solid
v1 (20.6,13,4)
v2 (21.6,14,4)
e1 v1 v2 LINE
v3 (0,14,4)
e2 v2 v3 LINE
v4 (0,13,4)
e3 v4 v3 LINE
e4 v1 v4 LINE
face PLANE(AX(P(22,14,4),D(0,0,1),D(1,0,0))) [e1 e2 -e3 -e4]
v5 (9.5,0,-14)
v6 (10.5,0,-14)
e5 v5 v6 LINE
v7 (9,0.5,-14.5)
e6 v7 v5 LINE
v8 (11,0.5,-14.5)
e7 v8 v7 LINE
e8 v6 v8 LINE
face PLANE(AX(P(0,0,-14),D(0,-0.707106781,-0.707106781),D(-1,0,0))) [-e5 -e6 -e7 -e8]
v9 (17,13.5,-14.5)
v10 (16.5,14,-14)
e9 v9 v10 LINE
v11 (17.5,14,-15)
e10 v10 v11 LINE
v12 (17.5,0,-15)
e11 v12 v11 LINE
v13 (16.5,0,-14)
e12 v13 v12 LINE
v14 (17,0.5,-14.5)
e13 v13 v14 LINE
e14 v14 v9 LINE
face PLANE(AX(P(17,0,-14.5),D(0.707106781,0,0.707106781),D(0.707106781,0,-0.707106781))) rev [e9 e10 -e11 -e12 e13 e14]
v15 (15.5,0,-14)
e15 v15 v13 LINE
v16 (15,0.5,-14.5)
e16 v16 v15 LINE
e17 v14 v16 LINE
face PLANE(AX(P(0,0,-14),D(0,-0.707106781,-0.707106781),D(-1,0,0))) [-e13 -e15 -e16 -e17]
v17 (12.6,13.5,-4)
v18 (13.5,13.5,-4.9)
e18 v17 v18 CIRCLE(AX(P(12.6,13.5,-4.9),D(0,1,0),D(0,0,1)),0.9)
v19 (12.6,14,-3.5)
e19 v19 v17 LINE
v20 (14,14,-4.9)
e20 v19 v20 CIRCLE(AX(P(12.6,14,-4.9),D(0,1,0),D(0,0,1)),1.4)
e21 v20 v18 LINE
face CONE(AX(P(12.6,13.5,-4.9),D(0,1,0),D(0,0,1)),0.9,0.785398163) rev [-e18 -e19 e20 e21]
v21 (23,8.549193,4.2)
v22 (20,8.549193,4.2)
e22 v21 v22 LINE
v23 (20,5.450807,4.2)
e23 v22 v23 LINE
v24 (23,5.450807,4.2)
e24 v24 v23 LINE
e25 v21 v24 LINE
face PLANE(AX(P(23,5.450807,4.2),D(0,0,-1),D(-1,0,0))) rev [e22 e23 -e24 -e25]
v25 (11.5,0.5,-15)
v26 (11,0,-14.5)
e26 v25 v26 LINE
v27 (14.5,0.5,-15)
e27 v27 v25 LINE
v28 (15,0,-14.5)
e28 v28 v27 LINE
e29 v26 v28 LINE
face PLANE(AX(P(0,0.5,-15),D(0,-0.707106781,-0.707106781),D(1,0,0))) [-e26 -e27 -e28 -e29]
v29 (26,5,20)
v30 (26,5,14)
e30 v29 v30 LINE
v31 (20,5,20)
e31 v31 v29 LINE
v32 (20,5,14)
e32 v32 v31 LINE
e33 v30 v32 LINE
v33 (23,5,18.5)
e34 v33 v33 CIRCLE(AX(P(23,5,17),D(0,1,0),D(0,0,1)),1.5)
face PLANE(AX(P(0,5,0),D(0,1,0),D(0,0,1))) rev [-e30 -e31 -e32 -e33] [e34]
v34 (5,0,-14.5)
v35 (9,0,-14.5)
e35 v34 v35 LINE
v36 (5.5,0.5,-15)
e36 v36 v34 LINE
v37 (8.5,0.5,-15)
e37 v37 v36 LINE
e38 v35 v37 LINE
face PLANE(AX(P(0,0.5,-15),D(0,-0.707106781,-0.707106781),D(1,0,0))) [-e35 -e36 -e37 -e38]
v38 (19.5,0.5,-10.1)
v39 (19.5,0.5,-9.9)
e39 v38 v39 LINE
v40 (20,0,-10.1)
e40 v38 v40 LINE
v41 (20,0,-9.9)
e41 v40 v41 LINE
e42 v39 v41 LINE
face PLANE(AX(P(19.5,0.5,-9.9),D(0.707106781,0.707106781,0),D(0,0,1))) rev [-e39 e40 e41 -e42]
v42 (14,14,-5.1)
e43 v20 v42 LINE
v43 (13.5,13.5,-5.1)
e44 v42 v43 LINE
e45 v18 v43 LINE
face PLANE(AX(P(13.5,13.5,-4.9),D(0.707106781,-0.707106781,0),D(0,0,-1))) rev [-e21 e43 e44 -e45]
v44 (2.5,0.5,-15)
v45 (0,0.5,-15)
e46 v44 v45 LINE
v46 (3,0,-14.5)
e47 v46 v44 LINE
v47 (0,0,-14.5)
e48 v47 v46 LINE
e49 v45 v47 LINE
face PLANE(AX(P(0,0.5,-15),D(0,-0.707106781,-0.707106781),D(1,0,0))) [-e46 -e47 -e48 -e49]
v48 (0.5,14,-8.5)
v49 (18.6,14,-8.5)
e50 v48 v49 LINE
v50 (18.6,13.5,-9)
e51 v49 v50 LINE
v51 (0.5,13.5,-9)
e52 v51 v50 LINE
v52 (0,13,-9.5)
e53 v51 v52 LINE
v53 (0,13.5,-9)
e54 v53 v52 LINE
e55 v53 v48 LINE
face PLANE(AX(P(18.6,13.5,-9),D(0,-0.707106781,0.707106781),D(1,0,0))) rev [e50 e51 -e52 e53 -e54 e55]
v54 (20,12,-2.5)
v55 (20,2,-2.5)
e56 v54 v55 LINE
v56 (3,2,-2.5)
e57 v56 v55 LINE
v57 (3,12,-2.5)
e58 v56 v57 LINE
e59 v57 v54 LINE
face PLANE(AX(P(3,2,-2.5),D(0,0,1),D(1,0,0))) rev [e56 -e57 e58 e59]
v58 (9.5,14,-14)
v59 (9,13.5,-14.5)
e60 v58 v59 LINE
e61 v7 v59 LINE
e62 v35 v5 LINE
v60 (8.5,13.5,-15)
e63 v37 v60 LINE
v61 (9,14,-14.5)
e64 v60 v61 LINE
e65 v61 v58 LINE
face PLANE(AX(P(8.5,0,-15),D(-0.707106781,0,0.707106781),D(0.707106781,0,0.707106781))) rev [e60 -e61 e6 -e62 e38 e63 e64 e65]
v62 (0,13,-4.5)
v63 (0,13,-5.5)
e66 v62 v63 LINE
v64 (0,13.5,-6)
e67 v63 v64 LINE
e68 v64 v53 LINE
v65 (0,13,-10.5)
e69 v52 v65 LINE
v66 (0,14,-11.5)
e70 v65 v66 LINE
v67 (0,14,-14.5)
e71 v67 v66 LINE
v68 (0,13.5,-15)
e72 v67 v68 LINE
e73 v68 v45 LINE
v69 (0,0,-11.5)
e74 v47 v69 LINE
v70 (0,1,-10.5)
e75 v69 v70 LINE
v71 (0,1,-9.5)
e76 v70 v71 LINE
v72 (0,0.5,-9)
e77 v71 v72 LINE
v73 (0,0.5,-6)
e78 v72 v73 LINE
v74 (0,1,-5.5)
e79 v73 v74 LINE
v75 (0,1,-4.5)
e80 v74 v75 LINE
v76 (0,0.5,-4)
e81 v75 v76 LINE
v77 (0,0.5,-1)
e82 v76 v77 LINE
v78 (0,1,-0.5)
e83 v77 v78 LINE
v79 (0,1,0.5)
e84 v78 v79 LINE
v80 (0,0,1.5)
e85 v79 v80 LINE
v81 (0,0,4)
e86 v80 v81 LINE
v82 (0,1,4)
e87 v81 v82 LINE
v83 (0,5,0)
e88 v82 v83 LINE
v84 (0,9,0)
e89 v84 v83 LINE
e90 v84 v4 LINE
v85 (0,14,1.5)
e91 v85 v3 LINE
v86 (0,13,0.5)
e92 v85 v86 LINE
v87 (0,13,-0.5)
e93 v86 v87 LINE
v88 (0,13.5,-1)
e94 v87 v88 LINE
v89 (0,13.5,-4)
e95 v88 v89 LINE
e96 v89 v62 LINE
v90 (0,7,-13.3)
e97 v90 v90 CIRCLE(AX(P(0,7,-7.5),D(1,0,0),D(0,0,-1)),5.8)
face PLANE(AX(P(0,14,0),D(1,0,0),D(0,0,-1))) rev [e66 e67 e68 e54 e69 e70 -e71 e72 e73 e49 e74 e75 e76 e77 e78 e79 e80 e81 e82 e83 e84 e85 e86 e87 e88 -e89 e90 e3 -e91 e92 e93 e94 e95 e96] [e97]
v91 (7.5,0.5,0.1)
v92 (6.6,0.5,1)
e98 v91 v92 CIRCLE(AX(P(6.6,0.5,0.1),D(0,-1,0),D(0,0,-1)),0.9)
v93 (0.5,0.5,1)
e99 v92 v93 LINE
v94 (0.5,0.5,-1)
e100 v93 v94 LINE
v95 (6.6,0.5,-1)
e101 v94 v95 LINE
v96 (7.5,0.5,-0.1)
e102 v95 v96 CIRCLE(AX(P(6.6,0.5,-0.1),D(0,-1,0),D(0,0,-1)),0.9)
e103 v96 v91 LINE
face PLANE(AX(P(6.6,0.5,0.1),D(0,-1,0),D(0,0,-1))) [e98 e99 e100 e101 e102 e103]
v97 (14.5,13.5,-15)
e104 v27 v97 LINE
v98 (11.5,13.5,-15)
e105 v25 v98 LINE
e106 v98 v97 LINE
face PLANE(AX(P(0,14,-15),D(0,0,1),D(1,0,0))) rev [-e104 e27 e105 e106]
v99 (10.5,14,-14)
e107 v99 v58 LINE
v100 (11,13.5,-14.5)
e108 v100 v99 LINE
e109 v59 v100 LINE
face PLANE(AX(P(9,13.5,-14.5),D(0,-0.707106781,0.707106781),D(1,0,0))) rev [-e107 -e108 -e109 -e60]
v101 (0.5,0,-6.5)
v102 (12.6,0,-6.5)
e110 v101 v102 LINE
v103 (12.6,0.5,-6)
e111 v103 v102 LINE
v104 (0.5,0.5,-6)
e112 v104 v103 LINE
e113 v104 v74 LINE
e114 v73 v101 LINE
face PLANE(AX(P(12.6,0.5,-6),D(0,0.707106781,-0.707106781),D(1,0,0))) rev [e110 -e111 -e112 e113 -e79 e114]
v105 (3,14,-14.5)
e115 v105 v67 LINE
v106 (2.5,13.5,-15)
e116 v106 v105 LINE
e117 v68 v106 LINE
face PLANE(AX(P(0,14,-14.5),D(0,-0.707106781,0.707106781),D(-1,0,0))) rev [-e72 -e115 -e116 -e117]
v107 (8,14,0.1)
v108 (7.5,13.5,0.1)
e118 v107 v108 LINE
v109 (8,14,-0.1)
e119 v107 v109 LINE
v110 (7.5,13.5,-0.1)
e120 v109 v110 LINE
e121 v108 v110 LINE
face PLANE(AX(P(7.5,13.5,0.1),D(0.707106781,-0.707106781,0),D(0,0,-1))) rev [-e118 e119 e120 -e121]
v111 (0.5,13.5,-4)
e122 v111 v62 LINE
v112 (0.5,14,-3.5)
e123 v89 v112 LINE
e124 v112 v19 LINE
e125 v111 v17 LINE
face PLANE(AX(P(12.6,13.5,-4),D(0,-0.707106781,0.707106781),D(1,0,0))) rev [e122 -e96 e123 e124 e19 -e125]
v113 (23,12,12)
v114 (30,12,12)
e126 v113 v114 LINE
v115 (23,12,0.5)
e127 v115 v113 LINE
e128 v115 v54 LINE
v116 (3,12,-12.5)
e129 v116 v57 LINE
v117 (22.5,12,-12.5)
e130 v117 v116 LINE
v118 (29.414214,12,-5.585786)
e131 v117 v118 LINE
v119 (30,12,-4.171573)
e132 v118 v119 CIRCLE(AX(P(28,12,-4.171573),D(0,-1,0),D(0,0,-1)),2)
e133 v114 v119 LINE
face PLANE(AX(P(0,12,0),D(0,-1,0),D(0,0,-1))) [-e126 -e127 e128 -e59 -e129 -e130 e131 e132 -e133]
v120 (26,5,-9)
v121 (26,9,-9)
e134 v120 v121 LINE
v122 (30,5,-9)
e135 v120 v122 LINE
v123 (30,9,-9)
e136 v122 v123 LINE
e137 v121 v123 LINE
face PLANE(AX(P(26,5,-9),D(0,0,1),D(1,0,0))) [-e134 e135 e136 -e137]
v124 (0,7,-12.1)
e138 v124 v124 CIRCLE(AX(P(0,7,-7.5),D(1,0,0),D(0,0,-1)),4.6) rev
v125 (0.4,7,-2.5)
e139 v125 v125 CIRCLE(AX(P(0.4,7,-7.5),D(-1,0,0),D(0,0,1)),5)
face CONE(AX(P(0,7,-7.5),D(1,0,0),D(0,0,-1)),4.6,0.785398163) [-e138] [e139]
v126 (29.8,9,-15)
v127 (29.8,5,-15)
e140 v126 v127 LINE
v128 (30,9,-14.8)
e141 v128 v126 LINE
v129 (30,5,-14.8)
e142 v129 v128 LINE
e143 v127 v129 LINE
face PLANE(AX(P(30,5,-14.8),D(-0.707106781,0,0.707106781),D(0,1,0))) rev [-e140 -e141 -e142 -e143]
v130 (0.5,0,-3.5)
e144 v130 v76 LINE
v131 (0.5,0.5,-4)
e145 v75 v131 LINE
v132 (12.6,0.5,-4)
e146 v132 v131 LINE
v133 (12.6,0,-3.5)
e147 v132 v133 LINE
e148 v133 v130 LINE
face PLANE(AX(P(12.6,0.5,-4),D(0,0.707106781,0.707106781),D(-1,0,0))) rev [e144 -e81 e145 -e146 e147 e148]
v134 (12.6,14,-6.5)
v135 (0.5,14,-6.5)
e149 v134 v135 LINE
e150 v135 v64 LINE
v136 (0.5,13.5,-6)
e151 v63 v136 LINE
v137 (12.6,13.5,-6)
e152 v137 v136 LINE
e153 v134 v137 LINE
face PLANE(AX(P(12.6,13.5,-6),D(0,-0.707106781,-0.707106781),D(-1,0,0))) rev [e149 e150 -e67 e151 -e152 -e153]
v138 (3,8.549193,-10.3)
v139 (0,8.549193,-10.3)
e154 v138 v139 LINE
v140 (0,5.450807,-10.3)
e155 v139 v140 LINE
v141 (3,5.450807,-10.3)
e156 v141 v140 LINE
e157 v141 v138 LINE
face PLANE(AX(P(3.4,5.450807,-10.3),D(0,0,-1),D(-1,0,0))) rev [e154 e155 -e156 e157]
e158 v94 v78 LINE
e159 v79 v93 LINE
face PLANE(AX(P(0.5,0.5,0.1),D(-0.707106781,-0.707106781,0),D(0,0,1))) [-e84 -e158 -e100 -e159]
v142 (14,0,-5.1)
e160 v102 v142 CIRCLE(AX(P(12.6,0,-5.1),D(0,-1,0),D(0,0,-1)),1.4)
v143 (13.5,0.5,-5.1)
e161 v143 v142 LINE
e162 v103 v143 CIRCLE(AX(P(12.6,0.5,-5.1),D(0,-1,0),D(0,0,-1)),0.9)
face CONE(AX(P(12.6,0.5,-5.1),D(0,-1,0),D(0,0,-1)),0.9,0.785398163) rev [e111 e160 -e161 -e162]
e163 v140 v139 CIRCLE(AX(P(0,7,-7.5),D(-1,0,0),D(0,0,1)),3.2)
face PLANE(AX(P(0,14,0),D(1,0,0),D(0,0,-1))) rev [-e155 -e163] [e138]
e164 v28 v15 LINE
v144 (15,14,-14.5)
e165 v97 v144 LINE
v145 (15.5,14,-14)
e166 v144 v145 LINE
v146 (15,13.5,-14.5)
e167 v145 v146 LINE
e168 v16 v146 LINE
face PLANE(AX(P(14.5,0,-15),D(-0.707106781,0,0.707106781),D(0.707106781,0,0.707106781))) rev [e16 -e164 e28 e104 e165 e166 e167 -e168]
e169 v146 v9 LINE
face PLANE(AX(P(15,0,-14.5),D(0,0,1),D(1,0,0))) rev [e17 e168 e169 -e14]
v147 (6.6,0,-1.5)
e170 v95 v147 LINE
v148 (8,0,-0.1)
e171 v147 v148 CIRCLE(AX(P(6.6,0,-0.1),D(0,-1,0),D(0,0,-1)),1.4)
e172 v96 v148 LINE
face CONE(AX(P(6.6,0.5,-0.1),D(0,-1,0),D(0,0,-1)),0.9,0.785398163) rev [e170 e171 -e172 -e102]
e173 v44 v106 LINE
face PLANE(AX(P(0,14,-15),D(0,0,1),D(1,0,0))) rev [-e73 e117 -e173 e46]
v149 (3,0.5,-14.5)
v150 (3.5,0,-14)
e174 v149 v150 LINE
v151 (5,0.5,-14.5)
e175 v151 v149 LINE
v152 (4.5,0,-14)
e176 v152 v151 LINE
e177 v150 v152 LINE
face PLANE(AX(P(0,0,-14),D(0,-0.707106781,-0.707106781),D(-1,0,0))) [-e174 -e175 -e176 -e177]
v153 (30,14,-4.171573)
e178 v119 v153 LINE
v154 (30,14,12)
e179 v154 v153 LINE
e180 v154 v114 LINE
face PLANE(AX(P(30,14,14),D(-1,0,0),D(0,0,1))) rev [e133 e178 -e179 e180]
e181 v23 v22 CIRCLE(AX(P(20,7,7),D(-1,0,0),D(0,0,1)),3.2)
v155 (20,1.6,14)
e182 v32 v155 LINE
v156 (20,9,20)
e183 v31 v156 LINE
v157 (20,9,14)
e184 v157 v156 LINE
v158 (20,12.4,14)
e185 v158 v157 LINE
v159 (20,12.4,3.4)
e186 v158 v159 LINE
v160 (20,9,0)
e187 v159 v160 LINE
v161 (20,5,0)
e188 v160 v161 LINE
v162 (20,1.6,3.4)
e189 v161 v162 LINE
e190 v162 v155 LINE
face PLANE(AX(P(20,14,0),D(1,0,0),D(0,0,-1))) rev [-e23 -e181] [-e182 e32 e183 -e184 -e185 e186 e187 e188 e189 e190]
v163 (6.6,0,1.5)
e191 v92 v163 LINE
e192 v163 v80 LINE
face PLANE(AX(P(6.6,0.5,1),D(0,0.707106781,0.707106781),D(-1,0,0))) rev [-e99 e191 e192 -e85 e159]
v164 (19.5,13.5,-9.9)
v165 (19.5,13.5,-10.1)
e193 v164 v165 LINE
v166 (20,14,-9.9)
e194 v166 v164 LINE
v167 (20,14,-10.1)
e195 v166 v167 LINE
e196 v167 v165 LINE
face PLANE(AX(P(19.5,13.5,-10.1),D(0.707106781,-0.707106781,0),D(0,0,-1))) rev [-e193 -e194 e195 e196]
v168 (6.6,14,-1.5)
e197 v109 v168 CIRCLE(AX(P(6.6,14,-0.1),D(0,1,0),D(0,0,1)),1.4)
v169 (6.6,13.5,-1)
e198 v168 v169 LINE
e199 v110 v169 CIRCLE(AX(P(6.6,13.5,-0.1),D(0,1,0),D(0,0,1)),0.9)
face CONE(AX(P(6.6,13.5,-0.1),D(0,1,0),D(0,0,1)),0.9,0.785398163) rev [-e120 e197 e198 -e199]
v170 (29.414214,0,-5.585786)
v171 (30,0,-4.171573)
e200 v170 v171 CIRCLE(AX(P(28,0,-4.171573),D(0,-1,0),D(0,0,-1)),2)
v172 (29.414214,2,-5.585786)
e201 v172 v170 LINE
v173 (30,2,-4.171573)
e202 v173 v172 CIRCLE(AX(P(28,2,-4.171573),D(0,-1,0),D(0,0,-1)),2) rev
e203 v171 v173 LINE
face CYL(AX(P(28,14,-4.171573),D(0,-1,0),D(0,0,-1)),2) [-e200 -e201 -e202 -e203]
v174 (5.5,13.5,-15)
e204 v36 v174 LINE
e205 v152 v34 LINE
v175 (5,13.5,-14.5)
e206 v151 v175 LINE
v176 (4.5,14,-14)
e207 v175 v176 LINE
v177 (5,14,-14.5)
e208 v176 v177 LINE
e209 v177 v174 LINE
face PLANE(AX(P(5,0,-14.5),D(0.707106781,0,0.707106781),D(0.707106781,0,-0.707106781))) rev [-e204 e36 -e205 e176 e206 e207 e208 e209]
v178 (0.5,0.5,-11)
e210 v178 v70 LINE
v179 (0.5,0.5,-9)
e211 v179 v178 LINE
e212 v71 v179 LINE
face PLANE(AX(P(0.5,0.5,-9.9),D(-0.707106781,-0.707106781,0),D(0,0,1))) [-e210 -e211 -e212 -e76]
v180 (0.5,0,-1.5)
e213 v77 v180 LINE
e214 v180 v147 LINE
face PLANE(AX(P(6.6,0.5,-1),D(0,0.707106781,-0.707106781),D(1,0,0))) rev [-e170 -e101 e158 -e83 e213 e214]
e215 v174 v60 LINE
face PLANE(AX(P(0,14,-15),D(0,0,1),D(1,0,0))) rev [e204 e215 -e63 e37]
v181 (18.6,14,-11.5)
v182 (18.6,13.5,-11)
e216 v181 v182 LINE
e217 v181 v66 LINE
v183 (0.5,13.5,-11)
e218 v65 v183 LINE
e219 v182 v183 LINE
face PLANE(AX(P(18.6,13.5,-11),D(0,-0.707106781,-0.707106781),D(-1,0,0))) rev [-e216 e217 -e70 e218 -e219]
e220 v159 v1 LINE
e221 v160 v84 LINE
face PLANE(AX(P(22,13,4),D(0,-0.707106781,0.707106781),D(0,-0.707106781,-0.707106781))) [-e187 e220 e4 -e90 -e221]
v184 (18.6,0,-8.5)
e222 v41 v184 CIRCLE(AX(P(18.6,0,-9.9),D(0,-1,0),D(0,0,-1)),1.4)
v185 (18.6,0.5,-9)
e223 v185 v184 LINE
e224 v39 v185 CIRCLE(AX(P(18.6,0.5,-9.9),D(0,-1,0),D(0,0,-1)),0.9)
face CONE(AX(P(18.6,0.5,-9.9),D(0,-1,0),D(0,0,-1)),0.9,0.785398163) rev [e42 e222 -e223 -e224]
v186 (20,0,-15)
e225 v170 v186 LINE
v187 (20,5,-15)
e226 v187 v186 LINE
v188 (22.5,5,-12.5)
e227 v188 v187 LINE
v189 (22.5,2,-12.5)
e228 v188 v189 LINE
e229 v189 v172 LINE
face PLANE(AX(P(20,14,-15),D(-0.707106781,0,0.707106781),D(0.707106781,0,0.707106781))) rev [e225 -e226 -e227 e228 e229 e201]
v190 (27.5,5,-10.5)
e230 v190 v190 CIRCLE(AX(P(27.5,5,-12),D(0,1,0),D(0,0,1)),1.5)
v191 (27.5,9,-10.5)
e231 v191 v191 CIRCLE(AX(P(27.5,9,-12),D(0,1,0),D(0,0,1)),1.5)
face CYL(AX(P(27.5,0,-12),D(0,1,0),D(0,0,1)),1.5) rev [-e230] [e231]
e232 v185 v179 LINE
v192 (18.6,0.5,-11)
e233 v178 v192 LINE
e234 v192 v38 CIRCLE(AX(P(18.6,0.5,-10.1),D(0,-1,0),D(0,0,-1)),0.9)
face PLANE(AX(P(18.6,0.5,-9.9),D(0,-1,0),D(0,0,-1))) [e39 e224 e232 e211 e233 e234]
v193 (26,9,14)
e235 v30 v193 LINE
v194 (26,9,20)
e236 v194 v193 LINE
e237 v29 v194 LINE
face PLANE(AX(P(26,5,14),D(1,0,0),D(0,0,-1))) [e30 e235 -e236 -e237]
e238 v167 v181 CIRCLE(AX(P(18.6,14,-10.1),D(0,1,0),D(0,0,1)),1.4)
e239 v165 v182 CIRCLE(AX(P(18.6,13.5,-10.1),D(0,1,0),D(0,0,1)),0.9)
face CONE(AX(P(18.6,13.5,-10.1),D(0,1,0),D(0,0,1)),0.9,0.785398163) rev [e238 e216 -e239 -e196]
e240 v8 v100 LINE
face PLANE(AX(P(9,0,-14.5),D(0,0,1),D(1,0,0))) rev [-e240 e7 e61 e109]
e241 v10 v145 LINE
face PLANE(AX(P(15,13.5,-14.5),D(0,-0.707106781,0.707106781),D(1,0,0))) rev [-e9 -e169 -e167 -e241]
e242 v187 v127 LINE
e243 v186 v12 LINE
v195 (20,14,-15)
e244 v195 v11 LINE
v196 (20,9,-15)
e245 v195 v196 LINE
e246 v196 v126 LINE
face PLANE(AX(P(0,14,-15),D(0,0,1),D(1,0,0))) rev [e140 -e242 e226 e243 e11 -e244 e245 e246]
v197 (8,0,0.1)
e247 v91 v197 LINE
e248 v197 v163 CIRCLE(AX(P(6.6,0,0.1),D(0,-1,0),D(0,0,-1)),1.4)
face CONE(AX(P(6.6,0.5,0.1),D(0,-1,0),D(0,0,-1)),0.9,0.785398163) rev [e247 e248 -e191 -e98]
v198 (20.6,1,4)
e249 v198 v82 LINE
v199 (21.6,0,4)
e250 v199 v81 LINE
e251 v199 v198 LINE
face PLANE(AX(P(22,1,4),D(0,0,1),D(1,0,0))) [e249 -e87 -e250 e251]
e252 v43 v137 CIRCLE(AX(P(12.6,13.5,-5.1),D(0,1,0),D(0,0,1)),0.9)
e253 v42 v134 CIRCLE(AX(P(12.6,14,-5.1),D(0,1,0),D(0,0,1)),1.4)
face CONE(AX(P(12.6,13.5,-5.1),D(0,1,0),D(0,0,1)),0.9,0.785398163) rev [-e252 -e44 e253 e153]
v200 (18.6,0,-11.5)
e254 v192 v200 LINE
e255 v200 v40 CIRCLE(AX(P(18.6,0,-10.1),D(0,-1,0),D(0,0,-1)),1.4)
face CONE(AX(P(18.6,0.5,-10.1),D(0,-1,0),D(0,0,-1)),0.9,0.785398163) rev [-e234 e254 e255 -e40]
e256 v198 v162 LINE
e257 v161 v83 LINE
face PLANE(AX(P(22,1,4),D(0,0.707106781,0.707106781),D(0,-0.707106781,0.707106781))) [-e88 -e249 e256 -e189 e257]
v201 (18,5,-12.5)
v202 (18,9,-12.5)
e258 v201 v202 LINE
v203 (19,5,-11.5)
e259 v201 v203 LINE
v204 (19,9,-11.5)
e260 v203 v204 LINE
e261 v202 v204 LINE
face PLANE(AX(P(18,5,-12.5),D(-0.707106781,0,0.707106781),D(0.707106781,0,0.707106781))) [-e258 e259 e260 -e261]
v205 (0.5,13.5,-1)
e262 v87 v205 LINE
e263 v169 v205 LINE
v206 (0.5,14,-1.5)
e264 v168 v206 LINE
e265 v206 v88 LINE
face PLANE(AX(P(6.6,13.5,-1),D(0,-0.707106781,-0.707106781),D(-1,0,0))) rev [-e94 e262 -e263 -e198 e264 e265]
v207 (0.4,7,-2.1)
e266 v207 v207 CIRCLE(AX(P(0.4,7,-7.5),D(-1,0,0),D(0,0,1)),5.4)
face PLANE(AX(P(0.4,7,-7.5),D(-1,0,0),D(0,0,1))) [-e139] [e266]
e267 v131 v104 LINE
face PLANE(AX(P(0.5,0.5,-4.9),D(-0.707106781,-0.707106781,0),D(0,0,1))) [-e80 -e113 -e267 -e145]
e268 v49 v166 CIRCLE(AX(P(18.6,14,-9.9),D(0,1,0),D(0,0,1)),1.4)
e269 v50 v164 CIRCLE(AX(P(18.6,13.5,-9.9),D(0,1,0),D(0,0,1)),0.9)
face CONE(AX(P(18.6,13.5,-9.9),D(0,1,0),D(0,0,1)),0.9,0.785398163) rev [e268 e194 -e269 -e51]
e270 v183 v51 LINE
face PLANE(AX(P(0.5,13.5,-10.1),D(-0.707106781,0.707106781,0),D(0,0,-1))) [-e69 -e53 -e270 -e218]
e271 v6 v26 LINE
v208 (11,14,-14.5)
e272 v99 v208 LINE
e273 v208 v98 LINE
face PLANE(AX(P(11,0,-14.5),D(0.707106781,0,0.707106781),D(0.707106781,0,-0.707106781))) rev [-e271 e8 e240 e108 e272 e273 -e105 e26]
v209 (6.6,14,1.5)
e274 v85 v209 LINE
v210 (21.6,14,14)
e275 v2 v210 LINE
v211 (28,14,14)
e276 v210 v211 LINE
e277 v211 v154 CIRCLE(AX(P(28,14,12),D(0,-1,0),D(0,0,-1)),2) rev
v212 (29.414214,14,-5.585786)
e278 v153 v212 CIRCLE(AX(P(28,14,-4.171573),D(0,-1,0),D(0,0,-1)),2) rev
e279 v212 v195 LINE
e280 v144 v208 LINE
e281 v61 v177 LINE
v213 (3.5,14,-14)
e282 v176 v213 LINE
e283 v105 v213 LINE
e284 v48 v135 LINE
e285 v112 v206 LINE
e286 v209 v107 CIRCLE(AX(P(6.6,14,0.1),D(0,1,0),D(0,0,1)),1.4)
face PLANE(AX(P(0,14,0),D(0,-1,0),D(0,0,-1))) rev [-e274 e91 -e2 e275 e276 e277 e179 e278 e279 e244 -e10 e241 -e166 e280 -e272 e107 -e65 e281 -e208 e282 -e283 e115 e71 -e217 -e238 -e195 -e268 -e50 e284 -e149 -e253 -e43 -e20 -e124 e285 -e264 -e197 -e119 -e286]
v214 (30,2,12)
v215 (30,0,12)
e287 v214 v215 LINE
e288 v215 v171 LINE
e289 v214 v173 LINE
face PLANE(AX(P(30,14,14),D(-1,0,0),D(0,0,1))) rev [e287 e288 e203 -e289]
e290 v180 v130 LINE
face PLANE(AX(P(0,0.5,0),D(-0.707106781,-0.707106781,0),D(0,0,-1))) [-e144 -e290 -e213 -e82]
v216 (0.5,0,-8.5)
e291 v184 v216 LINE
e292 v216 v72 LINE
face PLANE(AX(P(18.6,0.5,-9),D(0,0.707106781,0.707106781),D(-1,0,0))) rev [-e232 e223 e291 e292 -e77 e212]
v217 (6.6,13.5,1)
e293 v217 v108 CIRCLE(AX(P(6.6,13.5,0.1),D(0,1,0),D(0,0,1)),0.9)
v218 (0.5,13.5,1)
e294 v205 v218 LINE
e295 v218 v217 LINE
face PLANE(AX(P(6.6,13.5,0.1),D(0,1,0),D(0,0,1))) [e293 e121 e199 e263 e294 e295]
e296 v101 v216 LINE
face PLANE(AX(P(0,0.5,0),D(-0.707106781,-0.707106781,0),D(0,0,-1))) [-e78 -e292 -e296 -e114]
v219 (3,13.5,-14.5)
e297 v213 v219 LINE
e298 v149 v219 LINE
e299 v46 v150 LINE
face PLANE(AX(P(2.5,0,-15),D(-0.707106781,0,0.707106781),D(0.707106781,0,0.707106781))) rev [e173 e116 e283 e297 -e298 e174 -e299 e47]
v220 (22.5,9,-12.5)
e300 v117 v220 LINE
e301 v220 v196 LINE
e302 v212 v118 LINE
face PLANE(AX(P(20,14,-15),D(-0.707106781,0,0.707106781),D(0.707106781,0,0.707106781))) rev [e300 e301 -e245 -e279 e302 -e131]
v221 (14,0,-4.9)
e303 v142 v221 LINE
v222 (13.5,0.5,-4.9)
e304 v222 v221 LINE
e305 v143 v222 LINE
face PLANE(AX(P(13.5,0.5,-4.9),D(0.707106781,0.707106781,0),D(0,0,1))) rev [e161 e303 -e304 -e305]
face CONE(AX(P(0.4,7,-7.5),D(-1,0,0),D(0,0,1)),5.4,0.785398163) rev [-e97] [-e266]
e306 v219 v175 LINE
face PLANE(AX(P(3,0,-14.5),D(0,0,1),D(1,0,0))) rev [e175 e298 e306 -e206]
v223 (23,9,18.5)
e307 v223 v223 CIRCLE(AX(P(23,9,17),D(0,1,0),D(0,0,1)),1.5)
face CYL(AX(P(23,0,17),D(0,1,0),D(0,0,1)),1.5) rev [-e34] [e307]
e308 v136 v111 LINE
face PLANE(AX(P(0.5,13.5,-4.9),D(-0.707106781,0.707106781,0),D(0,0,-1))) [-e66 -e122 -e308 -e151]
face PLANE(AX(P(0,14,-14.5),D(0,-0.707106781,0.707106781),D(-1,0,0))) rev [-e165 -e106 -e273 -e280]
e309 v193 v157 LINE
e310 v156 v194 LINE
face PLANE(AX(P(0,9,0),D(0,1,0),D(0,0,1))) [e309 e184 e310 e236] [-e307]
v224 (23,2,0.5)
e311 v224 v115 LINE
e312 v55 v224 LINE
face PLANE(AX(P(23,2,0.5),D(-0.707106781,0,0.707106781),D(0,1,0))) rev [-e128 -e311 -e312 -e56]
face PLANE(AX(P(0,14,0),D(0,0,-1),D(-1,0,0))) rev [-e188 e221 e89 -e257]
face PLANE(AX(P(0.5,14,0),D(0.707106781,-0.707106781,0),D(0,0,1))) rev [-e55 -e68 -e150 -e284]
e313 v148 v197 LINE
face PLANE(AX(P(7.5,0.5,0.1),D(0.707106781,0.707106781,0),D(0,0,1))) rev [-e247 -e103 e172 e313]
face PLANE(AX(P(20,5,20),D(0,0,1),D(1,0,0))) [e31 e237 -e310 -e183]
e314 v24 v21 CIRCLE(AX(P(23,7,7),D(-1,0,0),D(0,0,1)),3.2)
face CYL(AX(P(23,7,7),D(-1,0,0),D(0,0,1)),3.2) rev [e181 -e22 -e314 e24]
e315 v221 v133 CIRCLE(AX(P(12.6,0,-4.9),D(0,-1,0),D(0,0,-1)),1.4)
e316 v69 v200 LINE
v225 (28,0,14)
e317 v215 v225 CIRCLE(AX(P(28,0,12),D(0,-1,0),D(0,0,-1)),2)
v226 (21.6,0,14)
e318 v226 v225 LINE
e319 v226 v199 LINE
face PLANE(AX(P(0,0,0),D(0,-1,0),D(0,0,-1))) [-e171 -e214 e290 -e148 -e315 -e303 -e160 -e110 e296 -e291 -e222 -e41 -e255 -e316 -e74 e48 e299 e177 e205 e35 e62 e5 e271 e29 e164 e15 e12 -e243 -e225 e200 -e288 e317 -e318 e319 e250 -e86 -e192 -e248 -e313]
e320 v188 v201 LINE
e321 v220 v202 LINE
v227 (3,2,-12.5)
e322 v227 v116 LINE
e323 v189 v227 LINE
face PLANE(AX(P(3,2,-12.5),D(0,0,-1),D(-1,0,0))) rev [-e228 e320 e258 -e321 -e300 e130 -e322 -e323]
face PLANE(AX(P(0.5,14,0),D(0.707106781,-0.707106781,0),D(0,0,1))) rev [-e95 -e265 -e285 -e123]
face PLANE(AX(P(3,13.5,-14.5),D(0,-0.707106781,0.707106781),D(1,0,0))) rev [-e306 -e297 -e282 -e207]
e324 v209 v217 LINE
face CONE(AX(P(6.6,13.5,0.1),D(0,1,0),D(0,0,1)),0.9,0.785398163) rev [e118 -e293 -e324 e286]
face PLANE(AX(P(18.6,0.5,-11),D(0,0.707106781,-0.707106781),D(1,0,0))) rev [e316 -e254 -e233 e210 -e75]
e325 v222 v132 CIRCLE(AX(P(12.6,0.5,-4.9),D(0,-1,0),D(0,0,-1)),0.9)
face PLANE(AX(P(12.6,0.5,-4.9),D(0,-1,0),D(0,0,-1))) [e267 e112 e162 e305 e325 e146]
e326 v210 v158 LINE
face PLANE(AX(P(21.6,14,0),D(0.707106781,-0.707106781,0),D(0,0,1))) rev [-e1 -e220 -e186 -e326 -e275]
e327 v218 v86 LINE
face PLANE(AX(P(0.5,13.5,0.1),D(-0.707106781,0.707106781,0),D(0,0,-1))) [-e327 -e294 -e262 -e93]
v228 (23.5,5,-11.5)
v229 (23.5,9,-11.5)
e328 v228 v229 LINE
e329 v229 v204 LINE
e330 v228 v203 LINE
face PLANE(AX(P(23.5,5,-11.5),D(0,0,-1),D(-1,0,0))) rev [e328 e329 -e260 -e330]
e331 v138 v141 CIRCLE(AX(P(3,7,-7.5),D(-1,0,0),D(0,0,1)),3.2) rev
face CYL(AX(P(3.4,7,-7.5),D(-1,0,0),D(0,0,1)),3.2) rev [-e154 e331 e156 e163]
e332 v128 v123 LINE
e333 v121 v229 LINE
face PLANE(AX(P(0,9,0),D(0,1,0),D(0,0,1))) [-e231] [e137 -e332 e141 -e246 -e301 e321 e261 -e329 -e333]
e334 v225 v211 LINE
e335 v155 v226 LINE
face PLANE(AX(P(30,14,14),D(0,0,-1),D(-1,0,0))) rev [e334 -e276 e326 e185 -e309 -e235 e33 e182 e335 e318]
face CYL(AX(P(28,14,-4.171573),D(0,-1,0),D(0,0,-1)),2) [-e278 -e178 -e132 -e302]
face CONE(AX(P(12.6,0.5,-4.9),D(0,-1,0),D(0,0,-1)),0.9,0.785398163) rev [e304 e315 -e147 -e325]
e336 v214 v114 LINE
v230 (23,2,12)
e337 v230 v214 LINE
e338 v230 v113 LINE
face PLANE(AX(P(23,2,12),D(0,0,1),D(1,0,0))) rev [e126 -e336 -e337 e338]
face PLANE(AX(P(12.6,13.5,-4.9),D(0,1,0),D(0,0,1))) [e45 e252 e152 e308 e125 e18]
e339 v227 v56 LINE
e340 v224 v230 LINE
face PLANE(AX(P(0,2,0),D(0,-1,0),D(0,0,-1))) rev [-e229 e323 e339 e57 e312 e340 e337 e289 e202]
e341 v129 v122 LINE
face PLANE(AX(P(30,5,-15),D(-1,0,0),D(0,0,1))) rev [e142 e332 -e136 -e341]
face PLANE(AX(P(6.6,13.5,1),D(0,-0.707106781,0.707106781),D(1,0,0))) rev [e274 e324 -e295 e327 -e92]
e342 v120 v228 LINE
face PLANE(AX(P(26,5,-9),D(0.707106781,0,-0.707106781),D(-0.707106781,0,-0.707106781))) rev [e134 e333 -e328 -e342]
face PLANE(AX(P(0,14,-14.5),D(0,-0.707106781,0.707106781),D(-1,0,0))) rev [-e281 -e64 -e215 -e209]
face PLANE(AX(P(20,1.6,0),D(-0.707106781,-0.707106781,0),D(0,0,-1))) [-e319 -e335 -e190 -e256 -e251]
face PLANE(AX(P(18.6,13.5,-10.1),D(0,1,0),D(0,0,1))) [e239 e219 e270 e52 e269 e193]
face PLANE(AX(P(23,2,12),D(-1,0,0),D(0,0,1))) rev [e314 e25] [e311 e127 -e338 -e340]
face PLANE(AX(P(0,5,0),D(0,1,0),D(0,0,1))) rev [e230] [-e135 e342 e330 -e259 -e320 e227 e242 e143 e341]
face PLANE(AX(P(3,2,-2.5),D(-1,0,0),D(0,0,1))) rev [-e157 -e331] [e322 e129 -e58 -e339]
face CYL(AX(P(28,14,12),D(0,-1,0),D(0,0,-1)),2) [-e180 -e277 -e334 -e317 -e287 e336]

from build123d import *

# Parameters (mm, degrees)
EXTRUDE_1_DEPTH     = 14
CUT_EXTRUDE_1_DEPTH = 3
CHAMFER_1_SIZE      = 1.6
EXTRUDE_START       = -5
SKETCH_3_W          = 6
SKETCH_3_H          = 6
EXTRUDE_3_DEPTH     = 4
CUT_EXTRUDE_2_DEPTH = 3.4
CUT_EXTRUDE_START   = -2
CUT_EXTRUDE_3_DEPTH = 10
EXTRUDE_4_DEPTH     = 4
CHAMFER_2_SIZE      = 3
SKETCH_7_R          = 1.5
CUT_EXTRUDE_4_DEPTH = 39.678159212
CHAMFER_3_SIZE      = 0.2
CUT_EXTRUDE_5_DEPTH = 39.678159212
CHAMFER_5_SIZE      = 0.5
EXTRUDE_5_DEPTH     = 22
CUT_EXTRUDE_6_DEPTH = 0.5
CUT_EXTRUDE_START_2 = -13.5
CUT_EXTRUDE_7_DEPTH = 0.5
SKETCH_13_R         = 5.4
SKETCH_13_R_2       = 5
CUT_EXTRUDE_8_DEPTH = 0.4
CHAMFER_7_SIZE      = 0.4
CHAMFER_8_SIZE      = 0.5
CHAMFER_6_SIZE      = 0.5
CHAMFER_9_SIZE      = 0.4
FILLET_1_R          = 2


# Some blends are built 0.0001 mm under size
with BuildPart() as part:
    # 草图1 → 凸台-拉伸1 (new body)
    with BuildSketch(Plane(origin=(0, 0, 0), x_dir=(1, 0, 0), z_dir=(0, 1, 0))):
        Polygon((20, 15), (30, 5), (30, -14), (20, -14), (20, 0), (0, 0), (0, 15), align=None)
    extrude(amount=EXTRUDE_1_DEPTH)

    # 草图2 → 切除-拉伸1 (cut)
    with BuildSketch(Plane.ZY.offset(-20)):
        with BuildLine():
            Line((4.2, 5.450806662), (4.2, 8.549193338))
            ThreePointArc((4.2, 8.549193338), (10.2, 7), (4.2, 5.450806662))
        make_face()
    extrude(amount=-CUT_EXTRUDE_1_DEPTH, mode=Mode.SUBTRACT)

    # 倒角1
    chamfer_1_edges = [part.edges().sort_by_distance(p)[0] for p in [
        (20, 14, 7),
        (20, 0, 7),
    ]]
    chamfer(chamfer_1_edges, length=CHAMFER_1_SIZE)

    # 草图3 → 凸台-拉伸3 (add)
    with BuildSketch(Plane(origin=(0, 14, 0), x_dir=(1, 0, 0), z_dir=(0, 1, 0)).offset(EXTRUDE_START)):
        with Locations((23, -17)):
            Rectangle(SKETCH_3_W, SKETCH_3_H)
    extrude(amount=-EXTRUDE_3_DEPTH)

    # 草图4 → 切除-拉伸2 (cut)
    with BuildSketch(Plane.ZY):
        with BuildLine():
            Line((-10.3, 5.450806662), (-10.3, 8.549193338))
            ThreePointArc((-10.3, 8.549193338), (-4.3, 7), (-10.3, 5.450806662))
        make_face()
    extrude(amount=-CUT_EXTRUDE_2_DEPTH, mode=Mode.SUBTRACT)

    # 草图5 → 切除-拉伸3 (cut)
    with BuildSketch(Plane(origin=(0, 14, 0), x_dir=(1, 0, 0), z_dir=(0, 1, 0)).offset(CUT_EXTRUDE_START)):
        Polygon((3, 2.5), (23, 2.5), (23, -12), (30, -12), (30, 12.5), (3, 12.5), align=None)
    extrude(amount=-CUT_EXTRUDE_3_DEPTH, mode=Mode.SUBTRACT)

    # 草图6 → 凸台-拉伸4 (add)
    with BuildSketch(Plane(origin=(0, 14, 0), x_dir=(1, 0, 0), z_dir=(0, 1, 0)).offset(EXTRUDE_START)):
        Polygon((23.5, 11.5), (19, 11.5), (18, 12.5), (22.5, 12.5), (20, 15), (30, 15), (30, 9), (26, 9), align=None)
    extrude(amount=-EXTRUDE_4_DEPTH)

    # 倒角2
    chamfer_2_edges = [part.edges().sort_by_distance(p)[0] for p in [
        (23, 7, -2.5),
    ]]
    chamfer(chamfer_2_edges, length=CHAMFER_2_SIZE)

    # 草图7 → 切除-拉伸4 (cut, through all)
    with BuildSketch(Plane(origin=(0, 14, 0), x_dir=(1, 0, 0), z_dir=(0, 1, 0))):
        with Locations(Location((27.5, 12, 0), (0, 0, 270))):
            Circle(SKETCH_7_R)
        with Locations(Location((23, -17, 0), (0, 0, 270))):
            Circle(SKETCH_7_R)
    extrude(amount=-CUT_EXTRUDE_4_DEPTH, mode=Mode.SUBTRACT)

    # 倒角3
    chamfer_3_edges = [part.edges().sort_by_distance(p)[0] for p in [
        (30, 7, -15),
    ]]
    chamfer(chamfer_3_edges, length=CHAMFER_3_SIZE)

    # 草图8 → 切除-拉伸5 (cut, through all)
    with BuildSketch(Plane(origin=(0, 14, 0), x_dir=(1, 0, 0), z_dir=(0, 1, 0))):
        Polygon((5.5, 15), (2.5, 15), (3, 14.5), (5, 14.5), align=None)
        Polygon((11.5, 15), (8.5, 15), (9, 14.5), (11, 14.5), align=None)
        Polygon((17.5, 15), (14.5, 15), (15, 14.5), (17, 14.5), align=None)
    extrude(amount=-CUT_EXTRUDE_5_DEPTH, mode=Mode.SUBTRACT)

    # 倒角5
    chamfer_5_edges = [part.edges().sort_by_distance(p)[0] for p in [
        (4, 0, -14.5),
        (4, 14, -14.5),
        (10, 0, -14.5),
        (10, 14, -14.5),
        (16, 0, -14.5),
        (16, 14, -14.5),
    ]]
    chamfer(chamfer_5_edges, length=CHAMFER_5_SIZE)

    # 草图15 → 凸台-拉伸5 (add)
    with BuildSketch(Plane.ZY):
        Polygon((0, 14), (4, 14), (4, 13), (0, 9), align=None)
        Polygon((0, 0), (4, 0), (4, 1), (0, 5), align=None)
    extrude(amount=-EXTRUDE_5_DEPTH)

    # 草图9 → 切除-拉伸6 (cut)
    with BuildSketch(Plane(origin=(0, 14, 0), x_dir=(1, 0, 0), z_dir=(0, 1, 0))):
        with BuildLine():
            Line((0, 3.5), (12.6, 3.5))
            ThreePointArc((12.6, 3.5), (13.589949494, 3.910050506), (14, 4.9))
            Line((14, 4.9), (14, 5.1))
            ThreePointArc((14, 5.1), (13.589949494, 6.089949494), (12.6, 6.5))
            Line((12.6, 6.5), (0, 6.5))
            Line((0, 6.5), (0, 3.5))
        make_face()
        with BuildLine():
            Line((0, 8.5), (18.6, 8.5))
            ThreePointArc((18.6, 8.5), (19.589949494, 8.910050506), (20, 9.9))
            Line((20, 9.9), (20, 10.1))
            ThreePointArc((20, 10.1), (19.589949494, 11.089949494), (18.6, 11.5))
            Line((18.6, 11.5), (0, 11.5))
            Line((0, 11.5), (0, 8.5))
        make_face()
        with BuildLine():
            Line((0, -1.5), (6.6, -1.5))
            ThreePointArc((6.6, -1.5), (7.589949494, -1.089949494), (8, -0.1))
            Line((8, -0.1), (8, 0.1))
            ThreePointArc((8, 0.1), (7.589949494, 1.089949494), (6.6, 1.5))
            Line((6.6, 1.5), (0, 1.5))
            Line((0, 1.5), (0, -1.5))
        make_face()
    extrude(amount=-CUT_EXTRUDE_6_DEPTH, mode=Mode.SUBTRACT)

    # 草图9<2> → 切除-拉伸7 (cut)
    with BuildSketch(Plane(origin=(0, 14, 0), x_dir=(1, 0, 0), z_dir=(0, 1, 0)).offset(CUT_EXTRUDE_START_2)):
        with BuildLine():
            Line((0, 3.5), (12.6, 3.5))
            ThreePointArc((12.6, 3.5), (13.589949494, 3.910050506), (14, 4.9))
            Line((14, 4.9), (14, 5.1))
            ThreePointArc((14, 5.1), (13.589949494, 6.089949494), (12.6, 6.5))
            Line((12.6, 6.5), (0, 6.5))
            Line((0, 6.5), (0, 3.5))
        make_face()
        with BuildLine():
            Line((0, 8.5), (18.6, 8.5))
            ThreePointArc((18.6, 8.5), (19.589949494, 8.910050506), (20, 9.9))
            Line((20, 9.9), (20, 10.1))
            ThreePointArc((20, 10.1), (19.589949494, 11.089949494), (18.6, 11.5))
            Line((18.6, 11.5), (0, 11.5))
            Line((0, 11.5), (0, 8.5))
        make_face()
        with BuildLine():
            Line((0, -1.5), (6.6, -1.5))
            ThreePointArc((6.6, -1.5), (7.589949494, -1.089949494), (8, -0.1))
            Line((8, -0.1), (8, 0.1))
            ThreePointArc((8, 0.1), (7.589949494, 1.089949494), (6.6, 1.5))
            Line((6.6, 1.5), (0, 1.5))
            Line((0, 1.5), (0, -1.5))
        make_face()
    extrude(amount=-CUT_EXTRUDE_7_DEPTH, mode=Mode.SUBTRACT)

    # 草图13 → 切除-拉伸8 (cut)
    with BuildSketch(Plane.ZY):
        with Locations((-7.5, 7)):
            Circle(SKETCH_13_R)
        with Locations((-7.5, 7)):
            Circle(SKETCH_13_R_2, mode=Mode.SUBTRACT)
    extrude(amount=-CUT_EXTRUDE_8_DEPTH, mode=Mode.SUBTRACT)

    # 倒角7
    chamfer_7_edges = [part.edges().sort_by_distance(p)[0] for p in [
        (0, 7, -12.5),
    ]]
    chamfer(chamfer_7_edges, length=CHAMFER_7_SIZE - 0.0001)  # a hair under: the kernel refuses the full size

    # 倒角8
    chamfer_8_edges = [part.edges().sort_by_distance(p)[0] for p in [
        (6.3, 13.5, -3.5),
        (13.589949494, 13.5, -3.910050506),
        (14, 13.5, -5),
        (13.589949494, 13.5, -6.089949494),
        (6.3, 13.5, -6.5),
        (9.3, 13.5, -8.5),
        (19.589949494, 13.5, -8.910050506),
        (20, 13.5, -10),
        (19.589949494, 13.5, -11.089949494),
        (9.3, 13.5, -11.5),
        (6.3, 0.5, -3.5),
        (13.589949494, 0.5, -3.910050506),
        (14, 0.5, -5),
        (13.589949494, 0.5, -6.089949494),
        (6.3, 0.5, -6.5),
        (9.3, 0.5, -8.5),
        (19.589949494, 0.5, -8.910050506),
        (20, 0.5, -10),
        (19.589949494, 0.5, -11.089949494),
        (9.3, 0.5, -11.5),
        (3.3, 0.5, 1.5),
        (7.589949494, 0.5, 1.089949494),
        (8, 0.5, 0),
        (7.589949494, 0.5, -1.089949494),
        (3.3, 0.5, -1.5),
        (3.3, 13.5, 1.5),
        (7.589949494, 13.5, 1.089949494),
        (8, 13.5, 0),
        (7.589949494, 13.5, -1.089949494),
        (3.3, 13.5, -1.5),
    ]]
    chamfer(chamfer_8_edges, length=CHAMFER_8_SIZE - 0.0001)  # a hair under: the kernel refuses the full size

    # 倒角6
    # the kernel refuses this chamfer: 0.5 mm, written as the material it takes off along each edge
    with BuildSketch(Plane(origin=(0, 0.5, -2.285941494), x_dir=(0, 1, 0), z_dir=(0, 0, 1))) as chamfer_6_piece_1_section:
        Polygon((CHAMFER_6_SIZE, 0), (0, -CHAMFER_6_SIZE), (0, 0), align=None)
    chamfer_6_piece_1 = extrude(amount=4.571882988, mode=Mode.PRIVATE)
    chamfer_6_piece_1 = split(chamfer_6_piece_1, bisect_by=Plane(origin=(0, 2.143020747, -0.642920747), z_dir=(0, -0.7071067811865476, -0.7071067811865476)), keep=Keep.TOP, mode=Mode.PRIVATE)
    chamfer_6_piece_1 = split(chamfer_6_piece_1, bisect_by=Plane(origin=(0, -0.142920747, -1.643020747), z_dir=(0, -0.7071067811865476, 0.7071067811865476)), keep=Keep.TOP, mode=Mode.PRIVATE)
    add(chamfer_6_piece_1, mode=Mode.SUBTRACT)
    with BuildSketch(Plane(origin=(0, 0, -4.785841494), x_dir=(0, 1, 0), z_dir=(0, 0, 1)), Plane(origin=(0, 0, -9.785841494), x_dir=(0, 1, 0), z_dir=(0, 0, 1))) as chamfer_6_piece_2:
        Polygon((CHAMFER_6_SIZE, 0), (0, -CHAMFER_6_SIZE), (0, 0), align=None)
    extrude(amount=4.571682988, mode=Mode.SUBTRACT)
    with BuildSketch(Plane(origin=(0, 0.5, -7.285941494), x_dir=(0, 1, 0), z_dir=(0, 0, 1))) as chamfer_6_piece_3_section:
        Polygon((CHAMFER_6_SIZE, 0), (0, -CHAMFER_6_SIZE), (0, 0), align=None)
    chamfer_6_piece_3 = extrude(amount=4.571882988, mode=Mode.PRIVATE)
    chamfer_6_piece_3 = split(chamfer_6_piece_3, bisect_by=Plane(origin=(0, 2.143020747, -5.642920747), z_dir=(0, -0.7071067811865474, -0.7071067811865477)), keep=Keep.TOP, mode=Mode.PRIVATE)
    chamfer_6_piece_3 = split(chamfer_6_piece_3, bisect_by=Plane(origin=(0, -0.142920747, -6.643020747), z_dir=(0, -0.7071067811865477, 0.7071067811865474)), keep=Keep.TOP, mode=Mode.PRIVATE)
    add(chamfer_6_piece_3, mode=Mode.SUBTRACT)
    with BuildSketch(Plane(origin=(0, 13.5, -2.285941494), x_dir=(0, -1, 0), z_dir=(0, 0, 1))) as chamfer_6_piece_4_section:
        Polygon((CHAMFER_6_SIZE, 0), (0, CHAMFER_6_SIZE), (0, 0), align=None)
    chamfer_6_piece_4 = extrude(amount=4.571882988, mode=Mode.PRIVATE)
    chamfer_6_piece_4 = split(chamfer_6_piece_4, bisect_by=Plane(origin=(0, 11.856979253, -0.642920747), z_dir=(0, 0.7071067811865474, -0.7071067811865477)), keep=Keep.TOP, mode=Mode.PRIVATE)
    chamfer_6_piece_4 = split(chamfer_6_piece_4, bisect_by=Plane(origin=(0, 14.142920747, -1.643020747), z_dir=(0, 0.7071067811865474, 0.7071067811865477)), keep=Keep.TOP, mode=Mode.PRIVATE)
    add(chamfer_6_piece_4, mode=Mode.SUBTRACT)
    with BuildSketch(Plane(origin=(0, 14, -4.785841494), x_dir=(0, -1, 0), z_dir=(0, 0, 1)), Plane(origin=(0, 14, -9.785841494), x_dir=(0, -1, 0), z_dir=(0, 0, 1))) as chamfer_6_piece_5:
        Polygon((CHAMFER_6_SIZE, 0), (0, CHAMFER_6_SIZE), (0, 0), align=None)
    extrude(amount=4.571682988, mode=Mode.SUBTRACT)
    with BuildSketch(Plane(origin=(0, 0.5, -12.285941494), x_dir=(0, 1, 0), z_dir=(0, 0, 1))) as chamfer_6_piece_6_section:
        Polygon((CHAMFER_6_SIZE, 0), (0, -CHAMFER_6_SIZE), (0, 0), align=None)
    chamfer_6_piece_6 = extrude(amount=4.571882988, mode=Mode.PRIVATE)
    chamfer_6_piece_6 = split(chamfer_6_piece_6, bisect_by=Plane(origin=(0, 2.143020747, -10.642920747), z_dir=(0, -0.7071067811865477, -0.7071067811865474)), keep=Keep.TOP, mode=Mode.PRIVATE)
    chamfer_6_piece_6 = split(chamfer_6_piece_6, bisect_by=Plane(origin=(0, -0.142920747, -11.643020747), z_dir=(0, -0.7071067811865477, 0.7071067811865474)), keep=Keep.TOP, mode=Mode.PRIVATE)
    add(chamfer_6_piece_6, mode=Mode.SUBTRACT)
    with BuildSketch(Plane(origin=(0, 13.5, -7.285941494), x_dir=(0, -1, 0), z_dir=(0, 0, 1))) as chamfer_6_piece_7_section:
        Polygon((CHAMFER_6_SIZE, 0), (0, CHAMFER_6_SIZE), (0, 0), align=None)
    chamfer_6_piece_7 = extrude(amount=4.571882988, mode=Mode.PRIVATE)
    chamfer_6_piece_7 = split(chamfer_6_piece_7, bisect_by=Plane(origin=(0, 11.856979253, -5.642920747), z_dir=(0, 0.7071067811865472, -0.7071067811865479)), keep=Keep.TOP, mode=Mode.PRIVATE)
    chamfer_6_piece_7 = split(chamfer_6_piece_7, bisect_by=Plane(origin=(0, 14.142920747, -6.643020747), z_dir=(0, 0.7071067811865476, 0.7071067811865476)), keep=Keep.TOP, mode=Mode.PRIVATE)
    add(chamfer_6_piece_7, mode=Mode.SUBTRACT)
    with BuildSketch(Plane(origin=(0, 13.5, -12.285941494), x_dir=(0, -1, 0), z_dir=(0, 0, 1))) as chamfer_6_piece_8_section:
        Polygon((CHAMFER_6_SIZE, 0), (0, CHAMFER_6_SIZE), (0, 0), align=None)
    chamfer_6_piece_8 = extrude(amount=4.571882988, mode=Mode.PRIVATE)
    chamfer_6_piece_8 = split(chamfer_6_piece_8, bisect_by=Plane(origin=(0, 14.142920747, -11.643020747), z_dir=(0, 0.7071067811865476, 0.7071067811865476)), keep=Keep.TOP, mode=Mode.PRIVATE)
    chamfer_6_piece_8 = split(chamfer_6_piece_8, bisect_by=Plane(origin=(0, 11.856979253, -10.642920747), z_dir=(0, 0.7071067811865476, -0.7071067811865476)), keep=Keep.TOP, mode=Mode.PRIVATE)
    add(chamfer_6_piece_8, mode=Mode.SUBTRACT)
    with BuildSketch(Plane(origin=(-1.285841494, 0, -15), x_dir=(0, 0, 1), z_dir=(1, 0, 0))) as chamfer_6_piece_9:
        Polygon((CHAMFER_6_SIZE, 0), (0, -CHAMFER_6_SIZE), (0, 0), align=None)
    extrude(amount=5.071682988, mode=Mode.SUBTRACT)
    with BuildSketch(Plane(origin=(10.214158506, 0, -15), x_dir=(0, 0, 1), z_dir=(1, 0, 0)), Plane(origin=(4.214158506, 0, -15), x_dir=(0, 0, 1), z_dir=(1, 0, 0))) as chamfer_6_piece_10:
        Polygon((CHAMFER_6_SIZE, 0), (0, -CHAMFER_6_SIZE), (0, 0), align=None)
    extrude(amount=5.571682988, mode=Mode.SUBTRACT)
    with BuildSketch(Plane(origin=(-1.285841494, 14, -15), x_dir=(0, 0, 1), z_dir=(1, 0, 0))) as chamfer_6_piece_11:
        Polygon((CHAMFER_6_SIZE, 0), (0, CHAMFER_6_SIZE), (0, 0), align=None)
    extrude(amount=5.071682988, mode=Mode.SUBTRACT)
    with BuildSketch(Plane(origin=(10.214158506, 14, -15), x_dir=(0, 0, 1), z_dir=(1, 0, 0)), Plane(origin=(4.214158506, 14, -15), x_dir=(0, 0, 1), z_dir=(1, 0, 0))) as chamfer_6_piece_12:
        Polygon((CHAMFER_6_SIZE, 0), (0, CHAMFER_6_SIZE), (0, 0), align=None)
    extrude(amount=5.571682988, mode=Mode.SUBTRACT)

    # 倒角9
    chamfer_9_edges = [part.edges().sort_by_distance(p)[0] for p in [
        (0, 7, -12.9),
    ]]
    chamfer(chamfer_9_edges, length=CHAMFER_9_SIZE - 0.0001)  # a hair under: the kernel refuses the full size

    # 圆角1
    fillet_1_edges = [part.edges().sort_by_distance(p)[0] for p in [
        (30, 13, -5),
        (30, 7, 14),
        (30, 1, -5),
    ]]
    fillet(fillet_1_edges, radius=FILLET_1_R - 0.0001)  # a hair under: the kernel refuses the full size


solid = part.part
